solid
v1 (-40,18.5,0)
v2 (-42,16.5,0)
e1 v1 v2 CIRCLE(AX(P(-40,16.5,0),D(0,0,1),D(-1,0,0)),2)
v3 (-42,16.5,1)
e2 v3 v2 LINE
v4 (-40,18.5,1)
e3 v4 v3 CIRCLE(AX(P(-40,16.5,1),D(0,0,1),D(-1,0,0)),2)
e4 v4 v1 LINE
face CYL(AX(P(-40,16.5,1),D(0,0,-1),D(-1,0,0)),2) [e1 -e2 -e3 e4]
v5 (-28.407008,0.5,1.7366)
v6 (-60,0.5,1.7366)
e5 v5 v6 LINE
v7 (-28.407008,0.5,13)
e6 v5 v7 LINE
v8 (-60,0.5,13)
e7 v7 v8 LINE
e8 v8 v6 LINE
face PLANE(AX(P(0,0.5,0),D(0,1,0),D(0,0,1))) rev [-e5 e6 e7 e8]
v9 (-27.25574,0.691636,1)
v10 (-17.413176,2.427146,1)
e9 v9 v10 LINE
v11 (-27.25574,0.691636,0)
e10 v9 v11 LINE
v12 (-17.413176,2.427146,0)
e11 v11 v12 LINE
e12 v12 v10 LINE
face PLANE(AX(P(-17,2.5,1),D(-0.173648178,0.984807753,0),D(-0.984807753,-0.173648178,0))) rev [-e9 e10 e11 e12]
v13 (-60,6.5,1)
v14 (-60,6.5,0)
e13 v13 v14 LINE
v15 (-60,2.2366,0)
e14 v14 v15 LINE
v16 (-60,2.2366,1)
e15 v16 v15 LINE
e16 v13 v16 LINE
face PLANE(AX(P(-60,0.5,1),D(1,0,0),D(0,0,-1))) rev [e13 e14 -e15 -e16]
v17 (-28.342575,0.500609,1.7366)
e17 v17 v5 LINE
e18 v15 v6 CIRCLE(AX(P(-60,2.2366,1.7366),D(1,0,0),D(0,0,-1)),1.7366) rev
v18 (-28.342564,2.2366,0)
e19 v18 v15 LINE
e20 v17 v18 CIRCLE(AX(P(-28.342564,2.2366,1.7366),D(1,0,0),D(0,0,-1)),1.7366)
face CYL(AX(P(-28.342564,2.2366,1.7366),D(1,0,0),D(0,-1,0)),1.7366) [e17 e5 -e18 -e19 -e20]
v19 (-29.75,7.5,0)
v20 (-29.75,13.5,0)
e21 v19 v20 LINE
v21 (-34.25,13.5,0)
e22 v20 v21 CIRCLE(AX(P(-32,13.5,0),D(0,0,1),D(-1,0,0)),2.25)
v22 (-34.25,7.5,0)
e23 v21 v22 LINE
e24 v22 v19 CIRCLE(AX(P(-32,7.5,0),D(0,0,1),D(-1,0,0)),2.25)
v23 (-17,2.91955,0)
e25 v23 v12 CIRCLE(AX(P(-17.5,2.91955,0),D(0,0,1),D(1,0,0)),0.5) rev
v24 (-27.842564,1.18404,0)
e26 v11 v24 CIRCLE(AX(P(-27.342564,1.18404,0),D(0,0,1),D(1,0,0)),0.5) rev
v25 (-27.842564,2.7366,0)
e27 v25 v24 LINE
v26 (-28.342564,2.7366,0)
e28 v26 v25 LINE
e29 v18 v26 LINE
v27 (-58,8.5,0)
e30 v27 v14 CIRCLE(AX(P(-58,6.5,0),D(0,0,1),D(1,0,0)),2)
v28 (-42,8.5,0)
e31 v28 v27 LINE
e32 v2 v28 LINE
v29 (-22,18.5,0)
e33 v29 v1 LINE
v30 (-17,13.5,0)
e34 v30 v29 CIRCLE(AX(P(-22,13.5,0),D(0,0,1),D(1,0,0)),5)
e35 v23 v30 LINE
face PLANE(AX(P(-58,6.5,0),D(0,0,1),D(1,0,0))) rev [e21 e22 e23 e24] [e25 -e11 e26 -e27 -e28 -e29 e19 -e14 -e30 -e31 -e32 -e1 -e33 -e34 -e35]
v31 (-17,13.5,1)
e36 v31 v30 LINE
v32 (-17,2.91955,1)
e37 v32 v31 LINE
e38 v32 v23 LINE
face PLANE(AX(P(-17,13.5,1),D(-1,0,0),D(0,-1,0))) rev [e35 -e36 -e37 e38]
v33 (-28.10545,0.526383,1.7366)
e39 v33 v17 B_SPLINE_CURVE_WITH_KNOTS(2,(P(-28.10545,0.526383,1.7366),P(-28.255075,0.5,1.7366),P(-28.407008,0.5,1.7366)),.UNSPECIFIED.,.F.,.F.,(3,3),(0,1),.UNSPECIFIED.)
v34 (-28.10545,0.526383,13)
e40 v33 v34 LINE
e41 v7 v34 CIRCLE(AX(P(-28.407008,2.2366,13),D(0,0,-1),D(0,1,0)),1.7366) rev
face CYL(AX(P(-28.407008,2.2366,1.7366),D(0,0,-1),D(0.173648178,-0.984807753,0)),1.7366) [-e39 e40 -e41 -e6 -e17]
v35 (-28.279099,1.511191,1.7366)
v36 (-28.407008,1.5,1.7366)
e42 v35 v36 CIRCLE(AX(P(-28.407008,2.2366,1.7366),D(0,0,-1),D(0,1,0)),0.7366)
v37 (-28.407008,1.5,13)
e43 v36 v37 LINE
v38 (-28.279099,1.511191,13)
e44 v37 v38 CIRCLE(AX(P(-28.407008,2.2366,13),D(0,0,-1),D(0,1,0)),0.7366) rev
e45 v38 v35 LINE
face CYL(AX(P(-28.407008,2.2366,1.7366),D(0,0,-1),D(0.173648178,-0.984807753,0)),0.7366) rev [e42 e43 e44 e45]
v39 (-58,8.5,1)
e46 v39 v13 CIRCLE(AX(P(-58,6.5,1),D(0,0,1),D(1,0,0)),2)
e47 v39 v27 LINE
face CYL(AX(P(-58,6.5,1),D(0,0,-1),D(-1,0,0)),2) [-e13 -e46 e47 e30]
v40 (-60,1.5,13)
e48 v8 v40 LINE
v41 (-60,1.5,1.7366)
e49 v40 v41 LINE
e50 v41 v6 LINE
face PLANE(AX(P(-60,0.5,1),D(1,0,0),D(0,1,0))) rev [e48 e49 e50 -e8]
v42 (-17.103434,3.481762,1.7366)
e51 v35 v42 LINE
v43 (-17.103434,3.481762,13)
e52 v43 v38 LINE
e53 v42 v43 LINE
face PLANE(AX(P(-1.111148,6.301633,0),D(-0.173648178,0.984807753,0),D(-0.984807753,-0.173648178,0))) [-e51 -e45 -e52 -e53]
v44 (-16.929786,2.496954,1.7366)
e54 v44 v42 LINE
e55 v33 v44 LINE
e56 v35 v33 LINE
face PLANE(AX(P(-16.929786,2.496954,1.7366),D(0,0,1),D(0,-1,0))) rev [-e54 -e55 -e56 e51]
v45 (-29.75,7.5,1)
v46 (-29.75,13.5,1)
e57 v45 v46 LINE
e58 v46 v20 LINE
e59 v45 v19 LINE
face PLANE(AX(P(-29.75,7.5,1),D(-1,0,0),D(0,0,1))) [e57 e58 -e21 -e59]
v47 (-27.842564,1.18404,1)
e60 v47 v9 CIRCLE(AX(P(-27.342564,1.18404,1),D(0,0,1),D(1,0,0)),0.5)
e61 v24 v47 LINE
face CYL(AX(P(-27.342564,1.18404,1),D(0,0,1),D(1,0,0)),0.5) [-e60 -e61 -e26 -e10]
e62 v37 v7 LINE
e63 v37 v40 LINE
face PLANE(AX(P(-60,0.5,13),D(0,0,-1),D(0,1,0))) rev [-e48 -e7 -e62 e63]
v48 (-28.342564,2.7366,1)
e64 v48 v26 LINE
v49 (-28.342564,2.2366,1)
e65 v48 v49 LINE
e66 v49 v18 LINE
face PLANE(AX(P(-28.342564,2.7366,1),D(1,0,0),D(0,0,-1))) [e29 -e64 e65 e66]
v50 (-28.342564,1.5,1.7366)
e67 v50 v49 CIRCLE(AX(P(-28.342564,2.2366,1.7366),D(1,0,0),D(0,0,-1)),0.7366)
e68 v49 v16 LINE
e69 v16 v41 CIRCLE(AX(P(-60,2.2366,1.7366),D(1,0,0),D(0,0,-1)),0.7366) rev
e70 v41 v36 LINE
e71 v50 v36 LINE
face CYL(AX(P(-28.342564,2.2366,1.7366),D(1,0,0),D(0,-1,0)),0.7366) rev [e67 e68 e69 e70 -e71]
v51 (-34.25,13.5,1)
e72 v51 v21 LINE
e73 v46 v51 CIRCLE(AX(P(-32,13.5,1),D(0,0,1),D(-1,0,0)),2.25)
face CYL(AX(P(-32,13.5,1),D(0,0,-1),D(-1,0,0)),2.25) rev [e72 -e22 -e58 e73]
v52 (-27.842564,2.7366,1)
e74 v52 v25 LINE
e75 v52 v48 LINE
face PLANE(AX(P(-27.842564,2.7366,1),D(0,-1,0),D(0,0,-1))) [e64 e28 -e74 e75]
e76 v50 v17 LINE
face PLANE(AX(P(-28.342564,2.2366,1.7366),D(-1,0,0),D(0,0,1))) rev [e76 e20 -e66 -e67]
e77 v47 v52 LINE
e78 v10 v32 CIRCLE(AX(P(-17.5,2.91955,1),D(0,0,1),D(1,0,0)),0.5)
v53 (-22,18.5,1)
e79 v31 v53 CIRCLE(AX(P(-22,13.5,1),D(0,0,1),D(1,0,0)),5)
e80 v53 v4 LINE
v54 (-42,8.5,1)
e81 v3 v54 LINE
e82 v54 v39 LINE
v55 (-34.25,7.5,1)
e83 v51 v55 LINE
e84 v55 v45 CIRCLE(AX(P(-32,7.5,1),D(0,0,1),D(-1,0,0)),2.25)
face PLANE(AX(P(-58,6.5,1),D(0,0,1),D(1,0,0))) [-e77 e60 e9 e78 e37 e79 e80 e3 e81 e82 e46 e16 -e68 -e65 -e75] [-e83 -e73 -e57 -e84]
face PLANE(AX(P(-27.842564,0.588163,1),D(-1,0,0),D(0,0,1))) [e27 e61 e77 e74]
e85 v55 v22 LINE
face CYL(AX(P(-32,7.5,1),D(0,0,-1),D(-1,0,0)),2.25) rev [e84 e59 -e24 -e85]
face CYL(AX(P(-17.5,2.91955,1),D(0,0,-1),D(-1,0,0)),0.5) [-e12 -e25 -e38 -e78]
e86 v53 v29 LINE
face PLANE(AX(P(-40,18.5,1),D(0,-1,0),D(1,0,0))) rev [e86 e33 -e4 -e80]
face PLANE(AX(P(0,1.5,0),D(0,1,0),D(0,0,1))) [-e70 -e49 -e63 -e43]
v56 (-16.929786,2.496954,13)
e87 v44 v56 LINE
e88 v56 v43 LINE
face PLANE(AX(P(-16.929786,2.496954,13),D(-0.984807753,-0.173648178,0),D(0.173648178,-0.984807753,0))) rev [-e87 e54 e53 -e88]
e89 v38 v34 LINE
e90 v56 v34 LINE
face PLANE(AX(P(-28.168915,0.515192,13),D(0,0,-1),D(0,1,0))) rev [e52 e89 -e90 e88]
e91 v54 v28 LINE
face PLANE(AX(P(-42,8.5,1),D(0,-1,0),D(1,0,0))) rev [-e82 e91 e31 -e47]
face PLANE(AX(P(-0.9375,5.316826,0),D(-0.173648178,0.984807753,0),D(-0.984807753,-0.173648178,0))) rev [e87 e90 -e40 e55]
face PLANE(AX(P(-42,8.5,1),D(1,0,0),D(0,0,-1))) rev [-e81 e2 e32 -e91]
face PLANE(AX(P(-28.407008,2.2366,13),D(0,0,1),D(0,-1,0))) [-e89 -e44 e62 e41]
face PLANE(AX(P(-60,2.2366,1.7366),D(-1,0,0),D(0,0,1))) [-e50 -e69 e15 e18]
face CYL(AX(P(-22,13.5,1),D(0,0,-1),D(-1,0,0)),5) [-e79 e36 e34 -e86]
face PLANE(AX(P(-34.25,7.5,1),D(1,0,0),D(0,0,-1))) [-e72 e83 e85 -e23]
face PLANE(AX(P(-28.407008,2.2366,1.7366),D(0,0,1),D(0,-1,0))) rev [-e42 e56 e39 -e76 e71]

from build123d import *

# Parameters (mm, degrees)
BASIS_BLECH1_DEPTH             = 1
KANTE_LASCHE2_STRIP_W          = 5.4732
KANTE_LASCHE2_STRIP_H          = 1
KANTE_LASCHE2_STRIP_CUT_DEPTH  = 31.657436361
KANTE_LASCHE2_RELIEF_W         = 5.9732
KANTE_LASCHE2_RELIEF_H         = 0.5
KANTE_LASCHE2_RELIEF_CUT_DEPTH = 1
KANTE_LASCHE2_DEPTH            = 31.657436361
KANTE_LASCHE3_STRIP_CUT_DEPTH  = 11.2634
KANTE_LASCHE3_DEPTH            = 11.2634
VERRUNDUNG1_R                  = 0.5


# Sheet-metal steps are written as plain solids
with BuildPart() as part:
    # Skizze1 → Basis-Blech1 (new body)
    with BuildSketch(Plane.XY):
        with BuildLine():
            Line((-28.342563639, 0.5), (-60, 0.5))
            Line((-60, 0.5), (-60, 6.5))
            ThreePointArc((-60, 6.5), (-59.414213562, 7.914213562), (-58, 8.5))
            Line((-58, 8.5), (-42, 8.5))
            Line((-42, 8.5), (-42, 16.5))
            ThreePointArc((-42, 16.5), (-41.414213562, 17.914213562), (-40, 18.5))
            Line((-40, 18.5), (-22, 18.5))
            ThreePointArc((-22, 18.5), (-18.464466094, 17.035533906), (-17, 13.5))
            Line((-17, 13.5), (-17, 2.5))
            Line((-17, 2.5), (-28.342563639, 0.5))
        make_face()
        with BuildLine():
            Line((-29.75, 7.5), (-29.75, 13.5))
            ThreePointArc((-29.75, 13.5), (-32, 15.75), (-34.25, 13.5))
            Line((-34.25, 13.5), (-34.25, 7.5))
            ThreePointArc((-34.25, 7.5), (-32, 5.25), (-29.75, 7.5))
        make_face(mode=Mode.SUBTRACT)
    extrude(amount=BASIS_BLECH1_DEPTH)

    # Kante-Lasche2 strip (across the edge) → Kante-Lasche2 strip cut (cut)
    with BuildSketch(Plane(origin=(-60, 0.5, 1), x_dir=(0, 1, 0), z_dir=(1, 0, 0))):
        with Locations((-1, -0.5)):
            Rectangle(KANTE_LASCHE2_STRIP_W, KANTE_LASCHE2_STRIP_H)
    extrude(amount=KANTE_LASCHE2_STRIP_CUT_DEPTH, mode=Mode.SUBTRACT)

    # Kante-Lasche2 relief (on the sheet) → Kante-Lasche2 relief cut (cut)
    with BuildSketch(Plane(origin=(-60, 2.2366, 1), x_dir=(0, 1, 0), z_dir=(0, 0, 1))):
        with Locations((-2.4866, -31.907436361)):
            Rectangle(KANTE_LASCHE2_RELIEF_W, KANTE_LASCHE2_RELIEF_H)
    extrude(amount=-KANTE_LASCHE2_RELIEF_CUT_DEPTH, mode=Mode.SUBTRACT)

    # Kante-Lasche2 section (across the edge) → Kante-Lasche2 (add)
    with BuildSketch(Plane(origin=(-60, 0.5, 1), x_dir=(0, 1, 0), z_dir=(1, 0, 0))):
        with BuildLine():
            Line((0, 0.7366), (0, 12))
            Line((0, 12), (1, 12))
            Line((1, 12), (1, 0.7366))
            ThreePointArc((1, 0.7366), (1.215745145, 0.215745145), (1.7366, 0))
            Line((1.7366, 0), (1.7366, -1))
            ThreePointArc((1.7366, -1), (0.508638364, -0.491361636), (0, 0.7366))
        make_face()
    extrude(amount=KANTE_LASCHE2_DEPTH)

    # Kante-Lasche3 strip (across the edge) → Kante-Lasche3 strip cut (cut)
    with BuildSketch(Plane(origin=(-28.342563639, 1.5, 13), x_dir=(-0.1736481776669238, 0.9848077530122092, 3.1093246385391698e-15), z_dir=(0, 0, -1))):
        Polygon((-1.92402835, 5.152936518), (-0.973617144, -0.237113276), (0.011190609, -0.063465098), (-0.939220597, 5.326584696), align=None)
    extrude(amount=KANTE_LASCHE3_STRIP_CUT_DEPTH, mode=Mode.SUBTRACT)

    # Kante-Lasche3 section (across the edge) → Kante-Lasche3 (add)
    with BuildSketch(Plane(origin=(-28.342563639, 1.5, 13), x_dir=(-0.1736481776669238, 0.9848077530122092, 3.1093246385391698e-15), z_dir=(0, 0, -1))):
        with BuildLine():
            Line((-1, 0.06444415), (-1, 11.412511336))
            Line((-1, 11.412511336), (0, 11.412511336))
            Line((0, 11.412511336), (0, 0.06444415))
            ThreePointArc((0, 0.06444415), (0.002802985, 0.000245229), (0.011190609, -0.063465098))
            Line((0.011190609, -0.063465098), (-0.973617144, -0.237113276))
            ThreePointArc((-0.973617144, -0.237113276), (-0.993391713, -0.086910513), (-1, 0.06444415))
        make_face()
    extrude(amount=KANTE_LASCHE3_DEPTH)

    # Verrundung1
    verrundung1_edges = [part.edges().sort_by_distance(p)[0] for p in [
        (-17, 2.5, 0.5),
        (-27.842563639, 0.58816349, 0.5),
    ]]
    fillet(verrundung1_edges, radius=VERRUNDUNG1_R)


solid = part.part
